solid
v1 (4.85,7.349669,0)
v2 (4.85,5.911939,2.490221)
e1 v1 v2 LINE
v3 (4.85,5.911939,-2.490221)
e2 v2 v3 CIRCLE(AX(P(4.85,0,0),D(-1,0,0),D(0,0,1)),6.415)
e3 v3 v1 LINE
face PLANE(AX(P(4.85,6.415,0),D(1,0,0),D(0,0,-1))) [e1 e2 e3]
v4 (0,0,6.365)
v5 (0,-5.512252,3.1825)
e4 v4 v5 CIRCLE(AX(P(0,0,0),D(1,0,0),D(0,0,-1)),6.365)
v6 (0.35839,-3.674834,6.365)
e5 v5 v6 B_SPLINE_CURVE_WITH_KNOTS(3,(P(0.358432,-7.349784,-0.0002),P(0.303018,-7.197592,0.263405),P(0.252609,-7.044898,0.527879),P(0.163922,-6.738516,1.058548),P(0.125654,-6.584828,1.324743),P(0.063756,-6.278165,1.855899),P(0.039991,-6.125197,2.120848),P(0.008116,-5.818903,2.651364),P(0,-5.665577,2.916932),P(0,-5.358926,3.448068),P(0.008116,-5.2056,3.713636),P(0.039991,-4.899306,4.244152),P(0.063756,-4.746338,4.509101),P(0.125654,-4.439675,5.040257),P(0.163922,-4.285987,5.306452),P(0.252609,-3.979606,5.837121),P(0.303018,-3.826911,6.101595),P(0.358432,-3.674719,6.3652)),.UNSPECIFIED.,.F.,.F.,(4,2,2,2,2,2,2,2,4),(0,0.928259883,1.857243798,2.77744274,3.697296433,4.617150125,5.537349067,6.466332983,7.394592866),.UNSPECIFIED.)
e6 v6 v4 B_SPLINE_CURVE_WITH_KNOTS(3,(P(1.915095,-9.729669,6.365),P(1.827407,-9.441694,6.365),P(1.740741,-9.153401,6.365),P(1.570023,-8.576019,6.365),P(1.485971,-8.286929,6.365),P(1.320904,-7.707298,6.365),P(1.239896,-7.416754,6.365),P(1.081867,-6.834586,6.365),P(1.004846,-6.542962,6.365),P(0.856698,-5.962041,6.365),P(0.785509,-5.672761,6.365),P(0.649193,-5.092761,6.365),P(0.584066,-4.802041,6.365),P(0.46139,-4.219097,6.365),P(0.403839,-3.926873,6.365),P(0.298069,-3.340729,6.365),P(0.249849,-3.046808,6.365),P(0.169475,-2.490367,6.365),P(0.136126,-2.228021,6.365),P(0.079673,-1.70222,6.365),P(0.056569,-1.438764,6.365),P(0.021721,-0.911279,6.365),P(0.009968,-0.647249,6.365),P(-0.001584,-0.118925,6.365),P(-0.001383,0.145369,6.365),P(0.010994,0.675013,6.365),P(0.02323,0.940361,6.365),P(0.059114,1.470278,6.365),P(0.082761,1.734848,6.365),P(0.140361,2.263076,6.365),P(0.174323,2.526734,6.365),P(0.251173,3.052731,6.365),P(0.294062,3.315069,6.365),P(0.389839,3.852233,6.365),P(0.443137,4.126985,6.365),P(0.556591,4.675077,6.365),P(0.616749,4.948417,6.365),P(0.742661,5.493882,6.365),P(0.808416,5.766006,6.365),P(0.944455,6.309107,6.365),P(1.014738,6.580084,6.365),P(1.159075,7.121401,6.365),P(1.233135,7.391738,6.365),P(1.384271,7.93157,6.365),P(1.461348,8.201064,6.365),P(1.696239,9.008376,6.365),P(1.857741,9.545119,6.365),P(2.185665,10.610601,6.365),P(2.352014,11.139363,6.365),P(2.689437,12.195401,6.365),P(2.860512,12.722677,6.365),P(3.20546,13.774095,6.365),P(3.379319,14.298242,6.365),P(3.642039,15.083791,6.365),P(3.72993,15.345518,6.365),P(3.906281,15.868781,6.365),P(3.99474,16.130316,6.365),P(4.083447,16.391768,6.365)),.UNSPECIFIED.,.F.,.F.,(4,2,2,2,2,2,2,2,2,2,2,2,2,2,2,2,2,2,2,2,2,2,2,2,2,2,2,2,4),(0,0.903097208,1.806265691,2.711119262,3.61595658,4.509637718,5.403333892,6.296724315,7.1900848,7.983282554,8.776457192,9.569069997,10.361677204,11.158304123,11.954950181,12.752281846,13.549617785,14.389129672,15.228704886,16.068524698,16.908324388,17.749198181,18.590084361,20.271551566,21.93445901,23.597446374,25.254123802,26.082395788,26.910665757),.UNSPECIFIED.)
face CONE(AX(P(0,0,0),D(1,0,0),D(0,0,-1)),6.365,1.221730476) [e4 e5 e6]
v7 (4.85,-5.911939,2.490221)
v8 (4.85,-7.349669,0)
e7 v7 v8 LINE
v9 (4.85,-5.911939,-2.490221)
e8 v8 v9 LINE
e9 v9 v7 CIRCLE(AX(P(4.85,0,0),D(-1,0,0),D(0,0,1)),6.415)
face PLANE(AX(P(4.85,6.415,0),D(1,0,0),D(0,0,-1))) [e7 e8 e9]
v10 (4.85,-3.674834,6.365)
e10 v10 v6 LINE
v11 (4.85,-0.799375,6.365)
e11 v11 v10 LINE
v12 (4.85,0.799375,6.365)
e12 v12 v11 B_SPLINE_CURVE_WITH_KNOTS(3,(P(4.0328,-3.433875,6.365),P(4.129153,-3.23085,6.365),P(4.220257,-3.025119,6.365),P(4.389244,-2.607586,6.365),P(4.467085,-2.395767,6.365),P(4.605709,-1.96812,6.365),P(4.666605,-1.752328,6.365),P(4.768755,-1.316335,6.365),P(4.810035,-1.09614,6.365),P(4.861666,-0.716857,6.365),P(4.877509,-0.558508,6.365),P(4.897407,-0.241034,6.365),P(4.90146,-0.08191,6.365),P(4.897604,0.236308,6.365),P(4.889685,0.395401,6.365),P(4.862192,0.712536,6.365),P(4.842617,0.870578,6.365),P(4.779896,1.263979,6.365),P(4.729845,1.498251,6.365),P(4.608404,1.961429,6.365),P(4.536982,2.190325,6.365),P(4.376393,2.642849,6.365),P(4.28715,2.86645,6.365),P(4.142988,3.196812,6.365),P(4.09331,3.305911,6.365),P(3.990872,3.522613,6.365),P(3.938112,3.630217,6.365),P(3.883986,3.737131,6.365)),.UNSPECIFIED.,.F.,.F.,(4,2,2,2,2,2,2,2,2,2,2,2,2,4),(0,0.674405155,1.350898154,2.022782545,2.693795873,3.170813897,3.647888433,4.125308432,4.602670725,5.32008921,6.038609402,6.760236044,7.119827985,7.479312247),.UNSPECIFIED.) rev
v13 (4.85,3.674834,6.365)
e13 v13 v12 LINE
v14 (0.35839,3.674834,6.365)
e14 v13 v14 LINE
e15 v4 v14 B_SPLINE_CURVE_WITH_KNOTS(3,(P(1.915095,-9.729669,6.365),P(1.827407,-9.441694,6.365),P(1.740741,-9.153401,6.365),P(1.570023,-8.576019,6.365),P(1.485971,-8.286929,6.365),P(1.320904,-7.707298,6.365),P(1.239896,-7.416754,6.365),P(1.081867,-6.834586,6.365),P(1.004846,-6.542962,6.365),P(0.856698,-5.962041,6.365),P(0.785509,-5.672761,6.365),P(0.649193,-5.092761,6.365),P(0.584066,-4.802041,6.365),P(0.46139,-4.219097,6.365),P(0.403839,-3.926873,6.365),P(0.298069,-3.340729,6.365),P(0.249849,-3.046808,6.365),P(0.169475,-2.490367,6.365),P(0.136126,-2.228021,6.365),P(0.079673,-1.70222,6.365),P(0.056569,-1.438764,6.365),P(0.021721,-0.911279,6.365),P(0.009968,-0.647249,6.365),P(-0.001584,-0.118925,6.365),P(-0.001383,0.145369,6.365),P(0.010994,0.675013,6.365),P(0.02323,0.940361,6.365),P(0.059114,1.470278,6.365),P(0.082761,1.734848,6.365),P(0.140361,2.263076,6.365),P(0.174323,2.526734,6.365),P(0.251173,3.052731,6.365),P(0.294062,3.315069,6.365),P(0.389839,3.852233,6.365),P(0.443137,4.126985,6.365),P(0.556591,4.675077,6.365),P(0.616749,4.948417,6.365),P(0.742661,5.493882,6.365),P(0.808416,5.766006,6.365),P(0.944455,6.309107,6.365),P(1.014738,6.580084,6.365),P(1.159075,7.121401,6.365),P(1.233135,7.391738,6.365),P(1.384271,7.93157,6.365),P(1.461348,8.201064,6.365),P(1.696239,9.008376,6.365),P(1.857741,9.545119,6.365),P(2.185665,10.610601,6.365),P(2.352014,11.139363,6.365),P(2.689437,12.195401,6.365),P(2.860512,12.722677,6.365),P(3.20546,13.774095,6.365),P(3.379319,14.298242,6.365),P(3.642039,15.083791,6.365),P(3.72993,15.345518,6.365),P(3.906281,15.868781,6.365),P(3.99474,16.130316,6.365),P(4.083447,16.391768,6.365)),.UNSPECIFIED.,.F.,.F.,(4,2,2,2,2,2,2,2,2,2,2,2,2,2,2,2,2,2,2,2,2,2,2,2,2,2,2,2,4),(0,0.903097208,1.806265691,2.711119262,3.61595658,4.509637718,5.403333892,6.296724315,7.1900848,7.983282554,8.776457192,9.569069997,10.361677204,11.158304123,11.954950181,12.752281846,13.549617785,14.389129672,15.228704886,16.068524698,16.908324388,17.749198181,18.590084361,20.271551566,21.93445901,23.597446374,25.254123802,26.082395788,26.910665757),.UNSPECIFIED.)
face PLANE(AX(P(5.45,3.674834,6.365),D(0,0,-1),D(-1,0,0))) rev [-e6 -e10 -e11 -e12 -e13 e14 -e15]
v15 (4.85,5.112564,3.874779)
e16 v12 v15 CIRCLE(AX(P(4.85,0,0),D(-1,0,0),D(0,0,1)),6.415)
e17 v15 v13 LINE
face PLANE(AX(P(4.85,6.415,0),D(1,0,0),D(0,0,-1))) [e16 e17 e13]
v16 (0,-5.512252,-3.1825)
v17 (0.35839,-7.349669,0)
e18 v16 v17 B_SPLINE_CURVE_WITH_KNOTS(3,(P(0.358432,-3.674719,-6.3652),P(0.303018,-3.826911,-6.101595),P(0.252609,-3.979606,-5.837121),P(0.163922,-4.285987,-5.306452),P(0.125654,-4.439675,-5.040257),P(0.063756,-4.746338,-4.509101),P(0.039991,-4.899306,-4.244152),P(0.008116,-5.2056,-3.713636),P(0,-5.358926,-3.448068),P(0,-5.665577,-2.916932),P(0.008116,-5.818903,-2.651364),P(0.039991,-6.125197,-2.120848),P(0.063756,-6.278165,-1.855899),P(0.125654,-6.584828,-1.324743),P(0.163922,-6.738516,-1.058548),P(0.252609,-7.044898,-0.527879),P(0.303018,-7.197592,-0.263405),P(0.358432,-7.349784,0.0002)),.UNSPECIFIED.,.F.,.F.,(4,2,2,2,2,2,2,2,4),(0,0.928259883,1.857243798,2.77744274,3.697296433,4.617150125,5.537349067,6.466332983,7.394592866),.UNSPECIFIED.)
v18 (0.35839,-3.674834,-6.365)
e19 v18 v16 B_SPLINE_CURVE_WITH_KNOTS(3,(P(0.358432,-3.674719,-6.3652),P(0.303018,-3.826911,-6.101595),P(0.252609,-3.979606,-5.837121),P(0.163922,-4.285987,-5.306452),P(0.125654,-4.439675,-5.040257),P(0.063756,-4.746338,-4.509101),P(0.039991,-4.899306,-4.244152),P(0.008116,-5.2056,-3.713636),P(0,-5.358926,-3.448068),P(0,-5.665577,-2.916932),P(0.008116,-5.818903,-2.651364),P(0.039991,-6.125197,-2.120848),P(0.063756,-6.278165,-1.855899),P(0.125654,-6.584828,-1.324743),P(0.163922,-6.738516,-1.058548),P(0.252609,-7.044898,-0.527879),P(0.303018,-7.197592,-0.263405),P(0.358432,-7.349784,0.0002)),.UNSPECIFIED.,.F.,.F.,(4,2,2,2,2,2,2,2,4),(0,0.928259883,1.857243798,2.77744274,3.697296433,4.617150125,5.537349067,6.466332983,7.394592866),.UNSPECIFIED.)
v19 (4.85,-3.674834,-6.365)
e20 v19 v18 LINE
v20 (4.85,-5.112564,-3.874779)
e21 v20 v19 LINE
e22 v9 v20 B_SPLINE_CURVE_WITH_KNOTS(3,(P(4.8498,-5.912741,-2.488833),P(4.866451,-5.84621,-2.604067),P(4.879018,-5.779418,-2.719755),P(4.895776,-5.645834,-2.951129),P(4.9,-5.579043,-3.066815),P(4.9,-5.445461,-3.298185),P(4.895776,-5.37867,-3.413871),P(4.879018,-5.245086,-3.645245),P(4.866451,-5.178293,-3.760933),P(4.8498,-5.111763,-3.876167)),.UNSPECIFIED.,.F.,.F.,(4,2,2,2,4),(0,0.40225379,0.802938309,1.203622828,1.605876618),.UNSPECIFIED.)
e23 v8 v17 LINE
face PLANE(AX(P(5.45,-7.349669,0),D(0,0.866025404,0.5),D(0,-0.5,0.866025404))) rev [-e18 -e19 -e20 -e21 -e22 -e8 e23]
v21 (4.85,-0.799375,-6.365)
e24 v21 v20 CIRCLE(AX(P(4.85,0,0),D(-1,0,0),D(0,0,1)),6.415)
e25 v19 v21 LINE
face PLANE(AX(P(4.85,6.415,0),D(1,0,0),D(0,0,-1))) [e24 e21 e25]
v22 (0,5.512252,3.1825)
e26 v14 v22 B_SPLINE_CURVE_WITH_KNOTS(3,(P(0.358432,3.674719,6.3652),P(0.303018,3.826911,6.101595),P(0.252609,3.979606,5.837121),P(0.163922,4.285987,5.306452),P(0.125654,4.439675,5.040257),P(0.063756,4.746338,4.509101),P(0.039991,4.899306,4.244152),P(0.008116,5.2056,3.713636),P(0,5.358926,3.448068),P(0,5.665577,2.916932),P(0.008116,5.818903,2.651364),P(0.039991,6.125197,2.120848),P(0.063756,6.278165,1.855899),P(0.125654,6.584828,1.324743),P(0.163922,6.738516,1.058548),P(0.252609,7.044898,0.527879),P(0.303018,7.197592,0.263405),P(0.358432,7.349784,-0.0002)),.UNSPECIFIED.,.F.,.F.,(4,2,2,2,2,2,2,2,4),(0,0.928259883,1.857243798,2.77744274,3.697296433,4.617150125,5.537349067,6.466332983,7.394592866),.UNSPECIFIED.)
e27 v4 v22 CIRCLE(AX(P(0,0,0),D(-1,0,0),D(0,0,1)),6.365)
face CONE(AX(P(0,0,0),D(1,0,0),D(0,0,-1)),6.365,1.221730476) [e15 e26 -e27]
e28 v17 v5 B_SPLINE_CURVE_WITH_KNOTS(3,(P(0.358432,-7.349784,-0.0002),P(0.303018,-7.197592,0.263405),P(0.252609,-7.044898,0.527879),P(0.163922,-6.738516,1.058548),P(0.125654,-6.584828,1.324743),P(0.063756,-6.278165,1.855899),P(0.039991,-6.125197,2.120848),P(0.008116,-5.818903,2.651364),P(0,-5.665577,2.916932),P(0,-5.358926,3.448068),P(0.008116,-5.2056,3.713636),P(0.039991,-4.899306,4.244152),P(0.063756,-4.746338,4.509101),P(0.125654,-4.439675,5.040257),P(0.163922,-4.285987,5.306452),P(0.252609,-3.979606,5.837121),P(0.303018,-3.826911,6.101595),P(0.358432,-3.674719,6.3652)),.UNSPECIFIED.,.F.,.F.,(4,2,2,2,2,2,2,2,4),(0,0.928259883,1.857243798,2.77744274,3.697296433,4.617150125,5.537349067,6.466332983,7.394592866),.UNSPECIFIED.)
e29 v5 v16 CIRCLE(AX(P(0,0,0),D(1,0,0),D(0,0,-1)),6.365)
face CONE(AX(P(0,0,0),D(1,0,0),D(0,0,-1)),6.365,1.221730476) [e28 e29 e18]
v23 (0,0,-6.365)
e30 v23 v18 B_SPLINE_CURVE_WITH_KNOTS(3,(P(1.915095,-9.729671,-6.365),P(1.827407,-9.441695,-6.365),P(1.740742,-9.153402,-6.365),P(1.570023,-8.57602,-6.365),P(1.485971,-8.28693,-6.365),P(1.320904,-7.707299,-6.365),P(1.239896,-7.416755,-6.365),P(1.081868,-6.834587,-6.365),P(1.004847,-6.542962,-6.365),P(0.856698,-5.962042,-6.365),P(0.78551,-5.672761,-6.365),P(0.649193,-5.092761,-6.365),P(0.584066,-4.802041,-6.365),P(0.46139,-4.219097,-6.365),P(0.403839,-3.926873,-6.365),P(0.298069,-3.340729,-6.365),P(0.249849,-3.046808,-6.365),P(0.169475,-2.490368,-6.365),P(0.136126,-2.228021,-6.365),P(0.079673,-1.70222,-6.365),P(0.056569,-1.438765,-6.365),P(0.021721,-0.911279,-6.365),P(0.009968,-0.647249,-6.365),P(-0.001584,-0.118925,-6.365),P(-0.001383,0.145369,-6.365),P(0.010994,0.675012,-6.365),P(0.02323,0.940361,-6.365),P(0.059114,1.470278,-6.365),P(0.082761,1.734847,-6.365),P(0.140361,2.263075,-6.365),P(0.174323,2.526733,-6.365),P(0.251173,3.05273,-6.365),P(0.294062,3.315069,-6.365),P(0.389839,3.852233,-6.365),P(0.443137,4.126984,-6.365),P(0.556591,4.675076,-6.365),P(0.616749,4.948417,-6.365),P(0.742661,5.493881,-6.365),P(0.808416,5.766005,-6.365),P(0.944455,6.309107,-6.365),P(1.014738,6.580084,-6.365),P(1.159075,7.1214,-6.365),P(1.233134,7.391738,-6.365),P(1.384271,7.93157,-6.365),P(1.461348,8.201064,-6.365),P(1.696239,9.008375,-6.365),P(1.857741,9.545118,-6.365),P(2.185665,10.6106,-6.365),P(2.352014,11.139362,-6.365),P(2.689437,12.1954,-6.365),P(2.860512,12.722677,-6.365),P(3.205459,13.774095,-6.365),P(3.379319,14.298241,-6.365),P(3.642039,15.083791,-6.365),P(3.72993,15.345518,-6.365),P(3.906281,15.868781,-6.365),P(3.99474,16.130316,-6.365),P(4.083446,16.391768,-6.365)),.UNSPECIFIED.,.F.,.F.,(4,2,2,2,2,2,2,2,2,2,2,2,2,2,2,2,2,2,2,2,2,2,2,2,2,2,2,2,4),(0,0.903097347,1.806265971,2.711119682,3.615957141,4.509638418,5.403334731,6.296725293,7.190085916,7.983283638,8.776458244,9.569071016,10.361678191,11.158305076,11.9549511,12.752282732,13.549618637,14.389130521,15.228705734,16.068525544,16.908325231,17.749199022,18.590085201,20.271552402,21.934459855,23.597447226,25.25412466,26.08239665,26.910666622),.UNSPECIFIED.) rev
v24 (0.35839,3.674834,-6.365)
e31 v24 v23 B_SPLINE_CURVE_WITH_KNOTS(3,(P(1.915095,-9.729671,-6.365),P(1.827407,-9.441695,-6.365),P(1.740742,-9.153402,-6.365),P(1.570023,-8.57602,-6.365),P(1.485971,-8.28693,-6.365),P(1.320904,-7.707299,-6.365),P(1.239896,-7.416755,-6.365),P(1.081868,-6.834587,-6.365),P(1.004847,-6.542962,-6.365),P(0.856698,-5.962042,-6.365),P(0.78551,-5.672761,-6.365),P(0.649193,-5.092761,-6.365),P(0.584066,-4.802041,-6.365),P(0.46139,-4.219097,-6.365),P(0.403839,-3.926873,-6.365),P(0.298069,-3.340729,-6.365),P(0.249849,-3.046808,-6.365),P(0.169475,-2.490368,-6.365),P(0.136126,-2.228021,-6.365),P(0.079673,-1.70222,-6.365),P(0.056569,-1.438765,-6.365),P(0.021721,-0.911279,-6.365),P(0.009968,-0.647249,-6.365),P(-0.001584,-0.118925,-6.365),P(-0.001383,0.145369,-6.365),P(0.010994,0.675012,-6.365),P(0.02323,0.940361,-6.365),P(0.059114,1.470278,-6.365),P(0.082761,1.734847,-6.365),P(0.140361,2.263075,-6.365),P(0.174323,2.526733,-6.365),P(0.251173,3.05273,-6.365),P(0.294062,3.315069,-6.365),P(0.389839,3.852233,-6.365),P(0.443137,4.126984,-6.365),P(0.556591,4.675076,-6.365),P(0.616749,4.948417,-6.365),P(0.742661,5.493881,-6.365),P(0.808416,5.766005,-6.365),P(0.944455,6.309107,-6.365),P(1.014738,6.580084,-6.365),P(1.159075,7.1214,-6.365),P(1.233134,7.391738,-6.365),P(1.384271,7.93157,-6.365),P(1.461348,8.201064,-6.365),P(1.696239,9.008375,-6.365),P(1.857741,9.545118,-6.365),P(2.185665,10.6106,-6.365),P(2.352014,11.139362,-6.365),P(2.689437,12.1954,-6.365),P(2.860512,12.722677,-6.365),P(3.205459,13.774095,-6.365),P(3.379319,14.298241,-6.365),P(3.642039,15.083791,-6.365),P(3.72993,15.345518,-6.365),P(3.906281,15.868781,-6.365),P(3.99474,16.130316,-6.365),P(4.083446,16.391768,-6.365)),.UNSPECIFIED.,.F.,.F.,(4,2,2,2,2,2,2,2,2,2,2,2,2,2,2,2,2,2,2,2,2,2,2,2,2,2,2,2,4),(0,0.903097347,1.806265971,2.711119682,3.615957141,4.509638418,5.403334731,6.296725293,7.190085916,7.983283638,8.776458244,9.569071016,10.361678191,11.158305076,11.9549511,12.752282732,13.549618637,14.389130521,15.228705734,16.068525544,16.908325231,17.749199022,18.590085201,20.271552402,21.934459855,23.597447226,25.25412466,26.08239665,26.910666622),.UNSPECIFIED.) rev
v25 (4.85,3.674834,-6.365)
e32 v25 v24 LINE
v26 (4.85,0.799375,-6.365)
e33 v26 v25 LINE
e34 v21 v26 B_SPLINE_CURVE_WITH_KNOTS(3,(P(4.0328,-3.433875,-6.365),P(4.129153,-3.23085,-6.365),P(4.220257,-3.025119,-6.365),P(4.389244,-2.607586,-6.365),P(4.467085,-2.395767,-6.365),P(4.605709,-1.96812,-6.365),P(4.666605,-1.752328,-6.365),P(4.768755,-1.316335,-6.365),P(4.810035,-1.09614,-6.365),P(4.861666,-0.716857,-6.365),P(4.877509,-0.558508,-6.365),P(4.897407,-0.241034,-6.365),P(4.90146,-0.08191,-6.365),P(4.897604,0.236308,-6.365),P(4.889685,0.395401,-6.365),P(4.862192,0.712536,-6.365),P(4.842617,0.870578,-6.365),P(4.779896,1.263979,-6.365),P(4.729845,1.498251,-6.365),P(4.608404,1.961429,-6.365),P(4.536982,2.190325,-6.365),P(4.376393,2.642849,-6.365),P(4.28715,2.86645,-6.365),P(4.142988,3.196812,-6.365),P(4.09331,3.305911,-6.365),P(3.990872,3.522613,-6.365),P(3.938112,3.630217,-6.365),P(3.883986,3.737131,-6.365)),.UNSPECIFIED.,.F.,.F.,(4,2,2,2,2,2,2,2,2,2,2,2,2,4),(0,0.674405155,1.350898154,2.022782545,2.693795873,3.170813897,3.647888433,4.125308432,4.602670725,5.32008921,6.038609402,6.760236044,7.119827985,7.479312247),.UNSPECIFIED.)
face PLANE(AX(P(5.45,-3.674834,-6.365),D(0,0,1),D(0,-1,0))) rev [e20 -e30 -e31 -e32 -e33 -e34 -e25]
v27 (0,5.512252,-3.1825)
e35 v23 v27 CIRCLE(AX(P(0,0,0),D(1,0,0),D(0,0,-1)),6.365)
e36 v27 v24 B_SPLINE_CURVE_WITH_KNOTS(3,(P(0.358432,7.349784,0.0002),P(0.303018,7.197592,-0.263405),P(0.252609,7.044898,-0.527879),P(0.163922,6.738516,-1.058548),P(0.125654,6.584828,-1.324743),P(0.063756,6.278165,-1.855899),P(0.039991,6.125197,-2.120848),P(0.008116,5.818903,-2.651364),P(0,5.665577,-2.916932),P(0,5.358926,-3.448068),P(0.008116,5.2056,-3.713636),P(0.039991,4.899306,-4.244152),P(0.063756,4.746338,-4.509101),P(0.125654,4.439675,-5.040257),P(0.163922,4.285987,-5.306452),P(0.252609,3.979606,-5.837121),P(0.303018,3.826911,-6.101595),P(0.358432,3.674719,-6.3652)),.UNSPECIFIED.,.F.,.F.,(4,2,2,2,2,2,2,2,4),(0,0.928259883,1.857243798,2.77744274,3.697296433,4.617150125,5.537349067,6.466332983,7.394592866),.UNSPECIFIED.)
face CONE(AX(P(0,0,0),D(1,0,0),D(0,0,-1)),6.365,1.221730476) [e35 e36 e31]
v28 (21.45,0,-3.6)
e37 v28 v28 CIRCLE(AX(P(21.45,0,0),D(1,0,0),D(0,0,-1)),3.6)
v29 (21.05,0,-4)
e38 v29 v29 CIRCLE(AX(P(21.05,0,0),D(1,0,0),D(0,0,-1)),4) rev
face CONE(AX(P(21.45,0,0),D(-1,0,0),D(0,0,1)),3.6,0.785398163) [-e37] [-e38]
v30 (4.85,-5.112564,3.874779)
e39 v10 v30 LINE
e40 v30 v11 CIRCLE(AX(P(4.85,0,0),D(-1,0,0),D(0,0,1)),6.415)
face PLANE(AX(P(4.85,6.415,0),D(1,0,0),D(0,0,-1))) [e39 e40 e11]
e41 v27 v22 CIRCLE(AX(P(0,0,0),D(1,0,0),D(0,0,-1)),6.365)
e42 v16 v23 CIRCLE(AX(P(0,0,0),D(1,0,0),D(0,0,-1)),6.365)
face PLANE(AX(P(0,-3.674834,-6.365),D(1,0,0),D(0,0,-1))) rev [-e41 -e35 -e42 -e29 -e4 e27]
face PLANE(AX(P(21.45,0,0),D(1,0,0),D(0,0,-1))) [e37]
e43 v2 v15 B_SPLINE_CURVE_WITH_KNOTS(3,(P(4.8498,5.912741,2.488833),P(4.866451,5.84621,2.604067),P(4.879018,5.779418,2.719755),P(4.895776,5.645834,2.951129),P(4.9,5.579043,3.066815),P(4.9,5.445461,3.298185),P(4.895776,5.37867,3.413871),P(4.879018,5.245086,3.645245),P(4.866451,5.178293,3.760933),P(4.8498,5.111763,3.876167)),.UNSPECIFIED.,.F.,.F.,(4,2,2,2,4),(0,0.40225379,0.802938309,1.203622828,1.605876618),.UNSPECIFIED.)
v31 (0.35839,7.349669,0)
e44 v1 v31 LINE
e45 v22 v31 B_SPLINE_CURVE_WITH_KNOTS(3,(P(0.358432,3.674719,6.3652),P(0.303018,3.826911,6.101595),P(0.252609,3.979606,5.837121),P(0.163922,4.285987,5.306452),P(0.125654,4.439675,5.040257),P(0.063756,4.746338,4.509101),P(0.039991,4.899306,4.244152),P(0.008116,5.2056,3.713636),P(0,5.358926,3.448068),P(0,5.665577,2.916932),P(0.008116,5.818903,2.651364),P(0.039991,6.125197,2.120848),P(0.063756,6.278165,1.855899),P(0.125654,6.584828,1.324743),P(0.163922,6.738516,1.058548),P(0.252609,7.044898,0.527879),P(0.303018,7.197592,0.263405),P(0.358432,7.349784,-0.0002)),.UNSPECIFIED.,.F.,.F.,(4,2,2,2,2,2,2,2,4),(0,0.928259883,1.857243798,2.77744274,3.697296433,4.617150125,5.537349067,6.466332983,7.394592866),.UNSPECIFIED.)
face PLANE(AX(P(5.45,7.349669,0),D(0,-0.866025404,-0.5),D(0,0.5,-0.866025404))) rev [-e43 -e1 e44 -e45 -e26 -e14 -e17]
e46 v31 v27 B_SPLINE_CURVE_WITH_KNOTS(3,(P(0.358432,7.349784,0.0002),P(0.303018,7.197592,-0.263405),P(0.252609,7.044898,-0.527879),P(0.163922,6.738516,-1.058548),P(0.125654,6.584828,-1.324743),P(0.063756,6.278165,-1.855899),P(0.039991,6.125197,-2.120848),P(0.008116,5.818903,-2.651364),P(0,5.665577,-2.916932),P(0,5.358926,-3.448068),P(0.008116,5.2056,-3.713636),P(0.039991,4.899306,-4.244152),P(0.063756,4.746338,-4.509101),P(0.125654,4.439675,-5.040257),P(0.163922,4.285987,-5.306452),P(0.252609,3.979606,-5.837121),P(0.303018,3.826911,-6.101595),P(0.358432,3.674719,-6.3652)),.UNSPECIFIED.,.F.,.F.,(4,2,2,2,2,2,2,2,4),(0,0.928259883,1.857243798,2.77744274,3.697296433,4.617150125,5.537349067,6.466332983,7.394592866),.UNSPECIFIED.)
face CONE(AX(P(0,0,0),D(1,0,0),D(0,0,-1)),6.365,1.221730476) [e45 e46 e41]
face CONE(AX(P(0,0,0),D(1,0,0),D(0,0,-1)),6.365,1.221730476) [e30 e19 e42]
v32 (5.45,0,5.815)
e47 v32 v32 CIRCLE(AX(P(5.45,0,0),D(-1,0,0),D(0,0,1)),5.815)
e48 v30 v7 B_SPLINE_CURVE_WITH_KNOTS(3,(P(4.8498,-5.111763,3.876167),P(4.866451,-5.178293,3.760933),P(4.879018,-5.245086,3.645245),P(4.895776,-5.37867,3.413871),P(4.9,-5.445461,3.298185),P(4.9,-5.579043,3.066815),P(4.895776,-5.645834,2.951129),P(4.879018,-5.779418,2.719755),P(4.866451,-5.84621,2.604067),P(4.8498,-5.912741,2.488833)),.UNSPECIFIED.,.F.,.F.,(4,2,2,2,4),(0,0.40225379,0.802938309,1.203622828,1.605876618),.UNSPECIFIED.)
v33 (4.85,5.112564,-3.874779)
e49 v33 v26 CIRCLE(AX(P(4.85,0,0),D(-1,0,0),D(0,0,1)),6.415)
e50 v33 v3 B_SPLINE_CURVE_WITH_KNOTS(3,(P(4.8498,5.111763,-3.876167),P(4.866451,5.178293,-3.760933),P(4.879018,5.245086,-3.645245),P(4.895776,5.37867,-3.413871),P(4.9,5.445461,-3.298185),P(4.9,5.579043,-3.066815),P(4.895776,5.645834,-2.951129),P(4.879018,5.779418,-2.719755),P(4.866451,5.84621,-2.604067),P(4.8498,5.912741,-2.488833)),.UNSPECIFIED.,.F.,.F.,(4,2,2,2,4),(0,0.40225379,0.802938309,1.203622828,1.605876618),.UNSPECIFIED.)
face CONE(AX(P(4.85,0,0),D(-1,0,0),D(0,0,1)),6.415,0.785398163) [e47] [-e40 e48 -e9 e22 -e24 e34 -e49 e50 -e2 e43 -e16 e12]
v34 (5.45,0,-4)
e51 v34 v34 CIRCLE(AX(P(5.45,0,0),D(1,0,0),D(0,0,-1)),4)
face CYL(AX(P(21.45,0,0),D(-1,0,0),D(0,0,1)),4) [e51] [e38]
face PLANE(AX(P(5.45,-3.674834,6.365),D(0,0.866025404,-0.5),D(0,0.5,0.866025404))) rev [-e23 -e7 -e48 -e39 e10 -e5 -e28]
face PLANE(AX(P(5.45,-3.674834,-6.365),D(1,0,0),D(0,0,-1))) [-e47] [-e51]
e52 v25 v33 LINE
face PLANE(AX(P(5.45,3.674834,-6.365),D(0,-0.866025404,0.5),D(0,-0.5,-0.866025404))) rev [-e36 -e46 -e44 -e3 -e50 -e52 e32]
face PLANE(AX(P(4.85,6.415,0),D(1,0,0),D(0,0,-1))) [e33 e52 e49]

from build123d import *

# Parameters (mm, degrees)
BASEHEAD_DEPTH = 5.45
SKETCH5_R      = 4
BASEBODY_DEPTH = 16


with BuildPart() as part:
    # Sketch2 → BaseHead (new body)
    with BuildSketch(Plane(origin=(0, 0, 0), x_dir=(0, 0, -1), z_dir=(1, 0, 0))):
        Polygon((6.365, -3.674834463), (6.365, 3.674834463), (0, 7.349668927), (-6.365, 3.674834463), (-6.365, -3.674834463), (0, -7.349668927), align=None)
    extrude(amount=BASEHEAD_DEPTH)

    # Sketch3 → BearingFace (revolve, cut)
    with BuildSketch(Plane.XY, mode=Mode.PRIVATE) as bearingface_sk:
        Polygon((5.45, 7.349668927), (5.45, 5.815), (4.85, 6.415), (4.85, 7.349668927), align=None)
    revolve(bearingface_sk.sketch.rotate(Axis((-0.957090588, 0, 0), (1, 0, 0)), 90), axis=Axis((-0.957090588, 0, 0), (1, 0, 0)), mode=Mode.SUBTRACT)

    # Sketch4 → HeadChamfer (revolve, cut)
    with BuildSketch(Plane.XY):
        Polygon((0, 7.349668927), (0.35839018, 7.349668927), (0, 6.365), align=None)
    revolve(axis=Axis((-0.493528746, 0, 0), (1, 0, 0)), mode=Mode.SUBTRACT)

    # Sketch5 → BaseBody (add)
    with BuildSketch(Plane(origin=(5.45, 0, 0), x_dir=(0, 0, -1), z_dir=(1, 0, 0))):
        Circle(SKETCH5_R)
    extrude(amount=BASEBODY_DEPTH)

    # Chamfer1: read off the stored shape, not the designer's step
    # Chamfer1 outline → Chamfer1 (revolve, cut)
    with BuildSketch(Plane.YX):
        Polygon((4, 21.45), (3.6, 21.45), (4, 21.05), align=None)
    revolve(axis=Axis((0, 0, 0), (1, 0, 0)), mode=Mode.SUBTRACT)


solid = part.part
